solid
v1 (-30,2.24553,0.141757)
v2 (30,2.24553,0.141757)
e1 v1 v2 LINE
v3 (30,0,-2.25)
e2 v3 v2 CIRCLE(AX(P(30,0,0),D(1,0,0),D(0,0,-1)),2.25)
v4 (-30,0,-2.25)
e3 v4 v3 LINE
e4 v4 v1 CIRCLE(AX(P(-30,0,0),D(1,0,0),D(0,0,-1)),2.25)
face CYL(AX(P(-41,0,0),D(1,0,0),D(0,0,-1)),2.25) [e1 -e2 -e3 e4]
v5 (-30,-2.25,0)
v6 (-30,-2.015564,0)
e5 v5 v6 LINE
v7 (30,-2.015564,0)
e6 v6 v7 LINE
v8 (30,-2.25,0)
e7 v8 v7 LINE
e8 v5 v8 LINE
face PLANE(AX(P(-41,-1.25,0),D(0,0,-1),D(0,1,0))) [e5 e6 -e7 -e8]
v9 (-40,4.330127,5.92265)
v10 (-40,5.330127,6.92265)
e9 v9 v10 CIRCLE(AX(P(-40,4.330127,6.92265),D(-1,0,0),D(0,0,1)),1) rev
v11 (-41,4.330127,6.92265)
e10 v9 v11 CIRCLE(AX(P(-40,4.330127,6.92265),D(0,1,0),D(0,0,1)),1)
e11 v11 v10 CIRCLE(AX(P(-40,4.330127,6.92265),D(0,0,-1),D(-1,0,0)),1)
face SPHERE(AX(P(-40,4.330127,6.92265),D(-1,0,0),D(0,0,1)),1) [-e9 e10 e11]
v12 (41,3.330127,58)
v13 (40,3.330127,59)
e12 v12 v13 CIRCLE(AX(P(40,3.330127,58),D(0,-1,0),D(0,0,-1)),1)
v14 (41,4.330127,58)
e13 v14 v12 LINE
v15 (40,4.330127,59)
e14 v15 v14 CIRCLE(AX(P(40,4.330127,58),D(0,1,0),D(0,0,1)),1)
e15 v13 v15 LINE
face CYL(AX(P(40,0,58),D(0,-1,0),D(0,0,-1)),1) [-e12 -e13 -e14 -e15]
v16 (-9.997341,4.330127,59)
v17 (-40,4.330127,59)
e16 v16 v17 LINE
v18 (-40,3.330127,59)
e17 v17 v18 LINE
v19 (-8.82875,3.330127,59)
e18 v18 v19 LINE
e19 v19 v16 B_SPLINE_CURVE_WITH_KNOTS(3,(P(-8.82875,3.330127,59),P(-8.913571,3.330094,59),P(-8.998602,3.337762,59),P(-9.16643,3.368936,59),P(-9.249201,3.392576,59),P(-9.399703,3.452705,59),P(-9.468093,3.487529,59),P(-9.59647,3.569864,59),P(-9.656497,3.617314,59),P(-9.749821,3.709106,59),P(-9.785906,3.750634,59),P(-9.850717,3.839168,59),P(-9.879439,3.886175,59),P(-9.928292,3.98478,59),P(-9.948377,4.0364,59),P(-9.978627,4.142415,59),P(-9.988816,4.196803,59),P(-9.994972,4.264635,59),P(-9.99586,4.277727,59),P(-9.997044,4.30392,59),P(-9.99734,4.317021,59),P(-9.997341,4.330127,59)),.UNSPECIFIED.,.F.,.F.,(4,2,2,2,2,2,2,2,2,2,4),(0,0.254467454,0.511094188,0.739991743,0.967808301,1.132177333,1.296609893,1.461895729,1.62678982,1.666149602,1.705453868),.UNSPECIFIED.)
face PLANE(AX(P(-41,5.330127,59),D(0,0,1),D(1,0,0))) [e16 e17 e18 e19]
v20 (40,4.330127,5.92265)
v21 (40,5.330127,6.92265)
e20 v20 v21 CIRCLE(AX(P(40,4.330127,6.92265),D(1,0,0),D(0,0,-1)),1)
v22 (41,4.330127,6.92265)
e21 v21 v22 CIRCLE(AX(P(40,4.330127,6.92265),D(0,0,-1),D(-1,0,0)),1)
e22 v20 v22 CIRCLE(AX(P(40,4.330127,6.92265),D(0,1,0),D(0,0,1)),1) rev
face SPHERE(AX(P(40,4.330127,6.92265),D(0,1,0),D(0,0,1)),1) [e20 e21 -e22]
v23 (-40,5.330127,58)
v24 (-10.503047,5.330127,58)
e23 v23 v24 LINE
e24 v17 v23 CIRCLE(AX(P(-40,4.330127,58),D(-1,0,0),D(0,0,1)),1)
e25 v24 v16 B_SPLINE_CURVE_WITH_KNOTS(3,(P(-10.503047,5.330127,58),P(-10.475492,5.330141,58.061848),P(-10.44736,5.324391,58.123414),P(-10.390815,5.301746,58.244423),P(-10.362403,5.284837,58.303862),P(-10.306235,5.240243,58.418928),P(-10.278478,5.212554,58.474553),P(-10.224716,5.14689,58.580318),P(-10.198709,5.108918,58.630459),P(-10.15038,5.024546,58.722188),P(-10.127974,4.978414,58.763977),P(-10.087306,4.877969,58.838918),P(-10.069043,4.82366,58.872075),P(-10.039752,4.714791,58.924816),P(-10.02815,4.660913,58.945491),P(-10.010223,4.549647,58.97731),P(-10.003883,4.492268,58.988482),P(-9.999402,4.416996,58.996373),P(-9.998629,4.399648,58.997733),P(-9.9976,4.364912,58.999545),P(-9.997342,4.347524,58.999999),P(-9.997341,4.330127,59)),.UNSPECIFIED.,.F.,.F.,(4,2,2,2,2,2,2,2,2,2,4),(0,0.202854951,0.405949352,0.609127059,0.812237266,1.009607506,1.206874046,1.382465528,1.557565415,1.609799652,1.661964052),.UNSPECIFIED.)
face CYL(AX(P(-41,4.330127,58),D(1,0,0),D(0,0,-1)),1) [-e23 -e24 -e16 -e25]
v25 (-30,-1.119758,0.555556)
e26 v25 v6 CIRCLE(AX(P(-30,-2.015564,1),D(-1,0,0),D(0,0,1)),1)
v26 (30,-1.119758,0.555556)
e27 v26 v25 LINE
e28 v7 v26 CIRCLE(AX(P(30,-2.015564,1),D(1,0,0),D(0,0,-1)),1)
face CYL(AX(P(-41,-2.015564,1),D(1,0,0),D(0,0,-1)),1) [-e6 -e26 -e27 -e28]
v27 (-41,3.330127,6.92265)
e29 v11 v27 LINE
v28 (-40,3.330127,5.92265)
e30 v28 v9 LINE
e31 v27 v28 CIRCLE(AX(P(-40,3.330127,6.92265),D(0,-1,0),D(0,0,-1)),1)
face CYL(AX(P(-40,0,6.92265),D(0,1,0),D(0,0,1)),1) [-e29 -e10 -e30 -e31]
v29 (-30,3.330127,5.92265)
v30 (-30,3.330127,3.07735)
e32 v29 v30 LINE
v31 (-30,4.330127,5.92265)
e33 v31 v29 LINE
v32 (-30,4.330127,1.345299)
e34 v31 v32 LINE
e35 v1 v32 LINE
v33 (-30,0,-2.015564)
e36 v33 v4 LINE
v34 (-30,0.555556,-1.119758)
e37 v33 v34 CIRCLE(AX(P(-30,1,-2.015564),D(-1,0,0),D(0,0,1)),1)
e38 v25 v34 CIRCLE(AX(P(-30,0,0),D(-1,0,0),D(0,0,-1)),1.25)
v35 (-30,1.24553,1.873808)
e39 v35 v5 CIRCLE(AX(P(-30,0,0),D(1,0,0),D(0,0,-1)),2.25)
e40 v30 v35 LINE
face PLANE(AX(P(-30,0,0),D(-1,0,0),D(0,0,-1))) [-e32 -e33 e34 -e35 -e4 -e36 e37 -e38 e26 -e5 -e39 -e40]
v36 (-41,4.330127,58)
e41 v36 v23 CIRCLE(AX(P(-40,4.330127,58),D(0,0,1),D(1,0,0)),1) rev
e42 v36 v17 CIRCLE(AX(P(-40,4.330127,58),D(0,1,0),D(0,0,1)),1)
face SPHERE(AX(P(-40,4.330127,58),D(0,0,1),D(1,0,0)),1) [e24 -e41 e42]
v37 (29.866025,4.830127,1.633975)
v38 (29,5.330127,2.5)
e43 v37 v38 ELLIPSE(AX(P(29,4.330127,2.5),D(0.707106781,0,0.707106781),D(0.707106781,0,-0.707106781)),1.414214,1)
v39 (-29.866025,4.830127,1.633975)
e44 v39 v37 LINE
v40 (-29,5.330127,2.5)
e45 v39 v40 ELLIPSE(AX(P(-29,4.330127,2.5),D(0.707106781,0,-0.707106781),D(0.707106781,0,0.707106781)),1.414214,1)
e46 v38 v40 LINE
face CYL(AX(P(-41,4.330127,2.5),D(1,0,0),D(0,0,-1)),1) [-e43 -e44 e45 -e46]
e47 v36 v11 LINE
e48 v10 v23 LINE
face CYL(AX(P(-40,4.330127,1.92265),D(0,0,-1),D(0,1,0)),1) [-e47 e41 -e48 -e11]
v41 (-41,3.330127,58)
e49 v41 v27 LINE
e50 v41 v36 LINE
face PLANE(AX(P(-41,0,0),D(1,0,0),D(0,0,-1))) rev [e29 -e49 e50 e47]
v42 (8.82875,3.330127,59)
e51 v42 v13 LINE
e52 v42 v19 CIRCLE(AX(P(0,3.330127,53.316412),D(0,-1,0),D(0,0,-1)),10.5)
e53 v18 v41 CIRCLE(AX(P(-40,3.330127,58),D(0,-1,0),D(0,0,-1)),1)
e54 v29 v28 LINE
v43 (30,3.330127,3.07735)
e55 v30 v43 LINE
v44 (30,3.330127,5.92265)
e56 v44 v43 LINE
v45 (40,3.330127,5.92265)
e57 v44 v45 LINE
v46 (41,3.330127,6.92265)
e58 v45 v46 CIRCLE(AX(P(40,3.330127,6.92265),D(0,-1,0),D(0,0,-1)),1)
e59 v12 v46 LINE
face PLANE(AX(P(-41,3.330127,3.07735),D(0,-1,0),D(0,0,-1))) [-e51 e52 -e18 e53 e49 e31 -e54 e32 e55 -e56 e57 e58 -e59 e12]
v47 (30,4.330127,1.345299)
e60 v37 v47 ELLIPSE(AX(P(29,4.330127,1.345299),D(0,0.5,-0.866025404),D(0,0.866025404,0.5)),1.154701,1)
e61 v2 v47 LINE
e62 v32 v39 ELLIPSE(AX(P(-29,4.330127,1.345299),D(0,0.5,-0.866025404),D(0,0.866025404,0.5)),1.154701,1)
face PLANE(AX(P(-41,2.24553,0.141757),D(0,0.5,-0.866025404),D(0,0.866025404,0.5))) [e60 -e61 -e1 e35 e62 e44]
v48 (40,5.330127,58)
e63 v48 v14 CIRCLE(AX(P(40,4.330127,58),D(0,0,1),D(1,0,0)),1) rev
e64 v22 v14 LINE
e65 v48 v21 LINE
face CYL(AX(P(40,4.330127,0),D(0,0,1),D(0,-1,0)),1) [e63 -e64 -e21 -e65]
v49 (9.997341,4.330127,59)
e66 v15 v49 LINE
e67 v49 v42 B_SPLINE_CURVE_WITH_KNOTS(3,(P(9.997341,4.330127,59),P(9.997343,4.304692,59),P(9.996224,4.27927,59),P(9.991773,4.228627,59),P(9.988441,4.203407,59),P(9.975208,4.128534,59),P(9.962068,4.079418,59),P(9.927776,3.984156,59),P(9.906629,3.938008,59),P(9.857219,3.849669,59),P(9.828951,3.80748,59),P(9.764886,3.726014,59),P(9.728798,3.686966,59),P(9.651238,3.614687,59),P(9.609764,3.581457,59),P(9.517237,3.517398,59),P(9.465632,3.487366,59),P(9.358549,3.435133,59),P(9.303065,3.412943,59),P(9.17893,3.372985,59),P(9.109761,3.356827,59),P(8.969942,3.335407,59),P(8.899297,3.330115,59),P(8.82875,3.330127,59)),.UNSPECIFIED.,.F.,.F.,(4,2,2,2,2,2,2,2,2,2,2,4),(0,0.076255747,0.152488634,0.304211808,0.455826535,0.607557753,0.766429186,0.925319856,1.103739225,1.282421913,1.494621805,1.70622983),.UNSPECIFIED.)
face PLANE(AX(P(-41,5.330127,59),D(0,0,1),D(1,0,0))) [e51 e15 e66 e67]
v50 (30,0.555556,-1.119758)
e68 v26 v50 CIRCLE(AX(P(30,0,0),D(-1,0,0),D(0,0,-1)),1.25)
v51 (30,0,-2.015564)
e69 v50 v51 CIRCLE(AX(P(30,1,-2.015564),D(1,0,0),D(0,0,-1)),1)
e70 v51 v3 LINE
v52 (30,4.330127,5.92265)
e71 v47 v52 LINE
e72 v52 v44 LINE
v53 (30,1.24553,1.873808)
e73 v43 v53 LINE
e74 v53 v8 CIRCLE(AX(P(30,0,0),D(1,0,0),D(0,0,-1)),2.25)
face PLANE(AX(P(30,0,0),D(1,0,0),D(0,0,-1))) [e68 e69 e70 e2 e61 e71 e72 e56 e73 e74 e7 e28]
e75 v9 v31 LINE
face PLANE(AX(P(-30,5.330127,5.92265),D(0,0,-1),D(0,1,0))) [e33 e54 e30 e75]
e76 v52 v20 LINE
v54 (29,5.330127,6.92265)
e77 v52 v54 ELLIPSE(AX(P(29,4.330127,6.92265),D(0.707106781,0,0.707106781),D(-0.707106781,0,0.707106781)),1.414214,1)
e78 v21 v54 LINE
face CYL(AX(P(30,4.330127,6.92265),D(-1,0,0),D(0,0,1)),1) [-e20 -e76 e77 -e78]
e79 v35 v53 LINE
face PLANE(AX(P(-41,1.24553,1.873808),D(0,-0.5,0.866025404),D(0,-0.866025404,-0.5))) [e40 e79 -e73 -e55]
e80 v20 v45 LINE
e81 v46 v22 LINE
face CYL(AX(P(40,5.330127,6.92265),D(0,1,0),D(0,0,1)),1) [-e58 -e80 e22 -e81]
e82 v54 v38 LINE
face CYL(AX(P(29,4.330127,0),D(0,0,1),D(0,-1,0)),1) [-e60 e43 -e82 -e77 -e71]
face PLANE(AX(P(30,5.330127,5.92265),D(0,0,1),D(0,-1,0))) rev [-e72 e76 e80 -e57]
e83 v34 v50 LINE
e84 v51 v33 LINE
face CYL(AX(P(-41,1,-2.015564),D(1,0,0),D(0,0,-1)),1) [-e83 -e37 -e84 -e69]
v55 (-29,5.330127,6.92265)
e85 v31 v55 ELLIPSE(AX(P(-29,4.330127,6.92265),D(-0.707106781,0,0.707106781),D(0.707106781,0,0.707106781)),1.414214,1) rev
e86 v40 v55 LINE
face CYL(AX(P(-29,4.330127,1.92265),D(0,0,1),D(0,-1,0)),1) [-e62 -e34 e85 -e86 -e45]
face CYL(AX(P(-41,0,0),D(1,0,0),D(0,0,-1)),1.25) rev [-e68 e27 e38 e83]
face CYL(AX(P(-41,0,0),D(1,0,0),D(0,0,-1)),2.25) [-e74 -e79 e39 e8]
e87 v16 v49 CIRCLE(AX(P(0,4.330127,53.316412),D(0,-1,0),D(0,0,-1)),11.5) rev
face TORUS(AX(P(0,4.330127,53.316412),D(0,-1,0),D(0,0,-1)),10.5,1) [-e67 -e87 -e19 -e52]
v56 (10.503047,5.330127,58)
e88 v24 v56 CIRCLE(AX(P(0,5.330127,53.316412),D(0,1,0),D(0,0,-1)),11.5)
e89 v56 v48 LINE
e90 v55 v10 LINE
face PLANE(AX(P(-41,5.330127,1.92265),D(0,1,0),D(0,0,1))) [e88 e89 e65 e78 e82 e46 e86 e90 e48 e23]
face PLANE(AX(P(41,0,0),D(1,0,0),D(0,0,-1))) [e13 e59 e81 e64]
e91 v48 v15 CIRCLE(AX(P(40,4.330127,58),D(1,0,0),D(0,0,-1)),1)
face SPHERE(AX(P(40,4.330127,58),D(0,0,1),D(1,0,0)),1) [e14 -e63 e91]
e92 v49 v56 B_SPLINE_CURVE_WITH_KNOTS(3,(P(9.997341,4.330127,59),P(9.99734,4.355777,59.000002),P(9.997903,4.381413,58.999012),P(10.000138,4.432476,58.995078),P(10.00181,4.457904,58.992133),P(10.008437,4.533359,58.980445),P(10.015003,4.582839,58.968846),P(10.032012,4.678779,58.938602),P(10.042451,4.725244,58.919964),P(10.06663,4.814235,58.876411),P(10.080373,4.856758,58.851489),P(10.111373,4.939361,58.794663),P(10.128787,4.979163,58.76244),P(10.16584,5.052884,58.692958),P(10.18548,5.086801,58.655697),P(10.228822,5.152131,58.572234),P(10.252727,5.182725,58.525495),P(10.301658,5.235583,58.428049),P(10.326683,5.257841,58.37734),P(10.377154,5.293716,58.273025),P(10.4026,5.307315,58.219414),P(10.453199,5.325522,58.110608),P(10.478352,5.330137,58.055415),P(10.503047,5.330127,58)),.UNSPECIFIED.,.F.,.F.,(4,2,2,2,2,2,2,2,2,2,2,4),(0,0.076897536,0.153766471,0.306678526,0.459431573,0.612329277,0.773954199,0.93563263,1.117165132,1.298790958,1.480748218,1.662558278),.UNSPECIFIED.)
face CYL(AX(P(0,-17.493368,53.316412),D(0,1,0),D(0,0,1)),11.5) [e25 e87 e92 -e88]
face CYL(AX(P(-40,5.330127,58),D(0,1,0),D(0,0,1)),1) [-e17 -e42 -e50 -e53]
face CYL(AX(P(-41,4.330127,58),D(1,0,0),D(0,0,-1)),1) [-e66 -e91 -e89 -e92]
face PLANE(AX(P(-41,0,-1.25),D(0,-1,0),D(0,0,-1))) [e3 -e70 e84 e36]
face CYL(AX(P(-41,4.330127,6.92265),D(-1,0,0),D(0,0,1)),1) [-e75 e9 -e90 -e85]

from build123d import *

# Parameters (mm, degrees)
BOSS_EXTRUDE1_DEPTH = 41
CUT_EXTRUDE1_DEPTH  = 11
BOSS_EXTRUDE4_DEPTH = 2
FILLET1_R           = 1


with BuildPart() as part:
    # Sketch2 → Boss-Extrude1 (new, symmetric)
    with BuildSketch(Plane(origin=(0, 0, 0), x_dir=(0, 0, -1), z_dir=(1, 0, 0))):
        with BuildLine():
            Line((-0.141756815, 2.245530005), (-1.922649731, 5.330127019))
            Line((-1.922649731, 5.330127019), (-59, 5.330127019))
            Line((-59, 5.330127019), (-59, 3.330127019))
            Line((-59, 3.330127019), (-3.077350269, 3.330127019))
            Line((-3.077350269, 3.330127019), (-1.873807622, 1.245530005))
            ThreePointArc((-1.873807622, 1.245530005), (-1.983045954, -1.063028101), (0, -2.25))
            Line((0, -2.25), (0, -1.25))
            ThreePointArc((0, -1.25), (-0.883883476, 0.883883476), (1.25, 0))
            Line((1.25, 0), (2.25, 0))
            ThreePointArc((2.25, 0), (1.540056357, 1.640343384), (-0.141756815, 2.245530005))
        make_face()
    extrude(amount=BOSS_EXTRUDE1_DEPTH, both=True)

    # Sketch4 → Cut-Extrude1 (cut)
    with BuildSketch(Plane(origin=(41, 0, 0), x_dir=(0, 0, -1), z_dir=(1, 0, 0))):
        with BuildLine():
            Line((-3.077350269, 3.330127019), (-1.873807622, 1.245530005))
            ThreePointArc((-1.873807622, 1.245530005), (-1.983045954, -1.063028101), (0, -2.25))
            Line((0, -2.25), (0, -1.25))
            ThreePointArc((0, -1.25), (-0.883883476, 0.883883476), (1.25, 0))
            Line((1.25, 0), (2.25, 0))
            ThreePointArc((2.25, 0), (1.540056357, 1.640343384), (-0.141756815, 2.245530005))
            Line((-0.141756815, 2.245530005), (-1.922649731, 5.330127019))
            Line((-1.922649731, 5.330127019), (-5.922649731, 5.330127019))
            Line((-5.922649731, 5.330127019), (-5.922649731, 3.330127019))
            Line((-5.922649731, 3.330127019), (-3.077350269, 3.330127019))
        make_face()
    cut_extrude1 = extrude(amount=-CUT_EXTRUDE1_DEPTH, mode=Mode.SUBTRACT)

    # Mirror1: Cut-Extrude1 across plane
    add(cut_extrude1.mirror(Plane(origin=(0, 0, 0), x_dir=(0, 0, 1), z_dir=(1, 0, 0))), mode=Mode.SUBTRACT)

    # Sketch8 → Boss-Extrude4 (add)
    with BuildSketch(Plane(origin=(0, 5.330127019, 0), x_dir=(1, 0, 0), z_dir=(0, 1, 0))):
        with BuildLine():
            Line((0, -59), (-9.997341071, -59))
            ThreePointArc((-9.997341071, -59), (0, -64.816412092), (9.997341071, -59))
            Line((9.997341071, -59), (0, -59))
        make_face()
    extrude(amount=-BOSS_EXTRUDE4_DEPTH)

    # Fillet1
    fillet1_edges = [part.edges().sort_by_distance(p)[0] for p in [
        (-35.5, 5.330127019, 5.922649731),
        (35.5, 5.330127019, 5.922649731),
        (-41, 4.330127019, 59),
        (41, 4.330127019, 59),
        (41, 5.330127019, 32.461324865),
        (-25.498670535, 5.330127019, 59),
        (25.498670535, 5.330127019, 59),
        (-41, 5.330127019, 32.461324865),
        (41, 4.330127019, 5.922649731),
        (-41, 4.330127019, 5.922649731),
        (30, 5.330127019, 3.922649731),
        (-30, 5.330127019, 3.922649731),
        (0, 5.330127019, 1.922649731),
        (0, 3.330127019, 64.816412092),
        (0, -1.25, 0),
        (0, 0, -1.25),
    ]]
    fillet(fillet1_edges, radius=FILLET1_R - 0.0001)  # a hair under: the kernel refuses the full size


solid = part.part
